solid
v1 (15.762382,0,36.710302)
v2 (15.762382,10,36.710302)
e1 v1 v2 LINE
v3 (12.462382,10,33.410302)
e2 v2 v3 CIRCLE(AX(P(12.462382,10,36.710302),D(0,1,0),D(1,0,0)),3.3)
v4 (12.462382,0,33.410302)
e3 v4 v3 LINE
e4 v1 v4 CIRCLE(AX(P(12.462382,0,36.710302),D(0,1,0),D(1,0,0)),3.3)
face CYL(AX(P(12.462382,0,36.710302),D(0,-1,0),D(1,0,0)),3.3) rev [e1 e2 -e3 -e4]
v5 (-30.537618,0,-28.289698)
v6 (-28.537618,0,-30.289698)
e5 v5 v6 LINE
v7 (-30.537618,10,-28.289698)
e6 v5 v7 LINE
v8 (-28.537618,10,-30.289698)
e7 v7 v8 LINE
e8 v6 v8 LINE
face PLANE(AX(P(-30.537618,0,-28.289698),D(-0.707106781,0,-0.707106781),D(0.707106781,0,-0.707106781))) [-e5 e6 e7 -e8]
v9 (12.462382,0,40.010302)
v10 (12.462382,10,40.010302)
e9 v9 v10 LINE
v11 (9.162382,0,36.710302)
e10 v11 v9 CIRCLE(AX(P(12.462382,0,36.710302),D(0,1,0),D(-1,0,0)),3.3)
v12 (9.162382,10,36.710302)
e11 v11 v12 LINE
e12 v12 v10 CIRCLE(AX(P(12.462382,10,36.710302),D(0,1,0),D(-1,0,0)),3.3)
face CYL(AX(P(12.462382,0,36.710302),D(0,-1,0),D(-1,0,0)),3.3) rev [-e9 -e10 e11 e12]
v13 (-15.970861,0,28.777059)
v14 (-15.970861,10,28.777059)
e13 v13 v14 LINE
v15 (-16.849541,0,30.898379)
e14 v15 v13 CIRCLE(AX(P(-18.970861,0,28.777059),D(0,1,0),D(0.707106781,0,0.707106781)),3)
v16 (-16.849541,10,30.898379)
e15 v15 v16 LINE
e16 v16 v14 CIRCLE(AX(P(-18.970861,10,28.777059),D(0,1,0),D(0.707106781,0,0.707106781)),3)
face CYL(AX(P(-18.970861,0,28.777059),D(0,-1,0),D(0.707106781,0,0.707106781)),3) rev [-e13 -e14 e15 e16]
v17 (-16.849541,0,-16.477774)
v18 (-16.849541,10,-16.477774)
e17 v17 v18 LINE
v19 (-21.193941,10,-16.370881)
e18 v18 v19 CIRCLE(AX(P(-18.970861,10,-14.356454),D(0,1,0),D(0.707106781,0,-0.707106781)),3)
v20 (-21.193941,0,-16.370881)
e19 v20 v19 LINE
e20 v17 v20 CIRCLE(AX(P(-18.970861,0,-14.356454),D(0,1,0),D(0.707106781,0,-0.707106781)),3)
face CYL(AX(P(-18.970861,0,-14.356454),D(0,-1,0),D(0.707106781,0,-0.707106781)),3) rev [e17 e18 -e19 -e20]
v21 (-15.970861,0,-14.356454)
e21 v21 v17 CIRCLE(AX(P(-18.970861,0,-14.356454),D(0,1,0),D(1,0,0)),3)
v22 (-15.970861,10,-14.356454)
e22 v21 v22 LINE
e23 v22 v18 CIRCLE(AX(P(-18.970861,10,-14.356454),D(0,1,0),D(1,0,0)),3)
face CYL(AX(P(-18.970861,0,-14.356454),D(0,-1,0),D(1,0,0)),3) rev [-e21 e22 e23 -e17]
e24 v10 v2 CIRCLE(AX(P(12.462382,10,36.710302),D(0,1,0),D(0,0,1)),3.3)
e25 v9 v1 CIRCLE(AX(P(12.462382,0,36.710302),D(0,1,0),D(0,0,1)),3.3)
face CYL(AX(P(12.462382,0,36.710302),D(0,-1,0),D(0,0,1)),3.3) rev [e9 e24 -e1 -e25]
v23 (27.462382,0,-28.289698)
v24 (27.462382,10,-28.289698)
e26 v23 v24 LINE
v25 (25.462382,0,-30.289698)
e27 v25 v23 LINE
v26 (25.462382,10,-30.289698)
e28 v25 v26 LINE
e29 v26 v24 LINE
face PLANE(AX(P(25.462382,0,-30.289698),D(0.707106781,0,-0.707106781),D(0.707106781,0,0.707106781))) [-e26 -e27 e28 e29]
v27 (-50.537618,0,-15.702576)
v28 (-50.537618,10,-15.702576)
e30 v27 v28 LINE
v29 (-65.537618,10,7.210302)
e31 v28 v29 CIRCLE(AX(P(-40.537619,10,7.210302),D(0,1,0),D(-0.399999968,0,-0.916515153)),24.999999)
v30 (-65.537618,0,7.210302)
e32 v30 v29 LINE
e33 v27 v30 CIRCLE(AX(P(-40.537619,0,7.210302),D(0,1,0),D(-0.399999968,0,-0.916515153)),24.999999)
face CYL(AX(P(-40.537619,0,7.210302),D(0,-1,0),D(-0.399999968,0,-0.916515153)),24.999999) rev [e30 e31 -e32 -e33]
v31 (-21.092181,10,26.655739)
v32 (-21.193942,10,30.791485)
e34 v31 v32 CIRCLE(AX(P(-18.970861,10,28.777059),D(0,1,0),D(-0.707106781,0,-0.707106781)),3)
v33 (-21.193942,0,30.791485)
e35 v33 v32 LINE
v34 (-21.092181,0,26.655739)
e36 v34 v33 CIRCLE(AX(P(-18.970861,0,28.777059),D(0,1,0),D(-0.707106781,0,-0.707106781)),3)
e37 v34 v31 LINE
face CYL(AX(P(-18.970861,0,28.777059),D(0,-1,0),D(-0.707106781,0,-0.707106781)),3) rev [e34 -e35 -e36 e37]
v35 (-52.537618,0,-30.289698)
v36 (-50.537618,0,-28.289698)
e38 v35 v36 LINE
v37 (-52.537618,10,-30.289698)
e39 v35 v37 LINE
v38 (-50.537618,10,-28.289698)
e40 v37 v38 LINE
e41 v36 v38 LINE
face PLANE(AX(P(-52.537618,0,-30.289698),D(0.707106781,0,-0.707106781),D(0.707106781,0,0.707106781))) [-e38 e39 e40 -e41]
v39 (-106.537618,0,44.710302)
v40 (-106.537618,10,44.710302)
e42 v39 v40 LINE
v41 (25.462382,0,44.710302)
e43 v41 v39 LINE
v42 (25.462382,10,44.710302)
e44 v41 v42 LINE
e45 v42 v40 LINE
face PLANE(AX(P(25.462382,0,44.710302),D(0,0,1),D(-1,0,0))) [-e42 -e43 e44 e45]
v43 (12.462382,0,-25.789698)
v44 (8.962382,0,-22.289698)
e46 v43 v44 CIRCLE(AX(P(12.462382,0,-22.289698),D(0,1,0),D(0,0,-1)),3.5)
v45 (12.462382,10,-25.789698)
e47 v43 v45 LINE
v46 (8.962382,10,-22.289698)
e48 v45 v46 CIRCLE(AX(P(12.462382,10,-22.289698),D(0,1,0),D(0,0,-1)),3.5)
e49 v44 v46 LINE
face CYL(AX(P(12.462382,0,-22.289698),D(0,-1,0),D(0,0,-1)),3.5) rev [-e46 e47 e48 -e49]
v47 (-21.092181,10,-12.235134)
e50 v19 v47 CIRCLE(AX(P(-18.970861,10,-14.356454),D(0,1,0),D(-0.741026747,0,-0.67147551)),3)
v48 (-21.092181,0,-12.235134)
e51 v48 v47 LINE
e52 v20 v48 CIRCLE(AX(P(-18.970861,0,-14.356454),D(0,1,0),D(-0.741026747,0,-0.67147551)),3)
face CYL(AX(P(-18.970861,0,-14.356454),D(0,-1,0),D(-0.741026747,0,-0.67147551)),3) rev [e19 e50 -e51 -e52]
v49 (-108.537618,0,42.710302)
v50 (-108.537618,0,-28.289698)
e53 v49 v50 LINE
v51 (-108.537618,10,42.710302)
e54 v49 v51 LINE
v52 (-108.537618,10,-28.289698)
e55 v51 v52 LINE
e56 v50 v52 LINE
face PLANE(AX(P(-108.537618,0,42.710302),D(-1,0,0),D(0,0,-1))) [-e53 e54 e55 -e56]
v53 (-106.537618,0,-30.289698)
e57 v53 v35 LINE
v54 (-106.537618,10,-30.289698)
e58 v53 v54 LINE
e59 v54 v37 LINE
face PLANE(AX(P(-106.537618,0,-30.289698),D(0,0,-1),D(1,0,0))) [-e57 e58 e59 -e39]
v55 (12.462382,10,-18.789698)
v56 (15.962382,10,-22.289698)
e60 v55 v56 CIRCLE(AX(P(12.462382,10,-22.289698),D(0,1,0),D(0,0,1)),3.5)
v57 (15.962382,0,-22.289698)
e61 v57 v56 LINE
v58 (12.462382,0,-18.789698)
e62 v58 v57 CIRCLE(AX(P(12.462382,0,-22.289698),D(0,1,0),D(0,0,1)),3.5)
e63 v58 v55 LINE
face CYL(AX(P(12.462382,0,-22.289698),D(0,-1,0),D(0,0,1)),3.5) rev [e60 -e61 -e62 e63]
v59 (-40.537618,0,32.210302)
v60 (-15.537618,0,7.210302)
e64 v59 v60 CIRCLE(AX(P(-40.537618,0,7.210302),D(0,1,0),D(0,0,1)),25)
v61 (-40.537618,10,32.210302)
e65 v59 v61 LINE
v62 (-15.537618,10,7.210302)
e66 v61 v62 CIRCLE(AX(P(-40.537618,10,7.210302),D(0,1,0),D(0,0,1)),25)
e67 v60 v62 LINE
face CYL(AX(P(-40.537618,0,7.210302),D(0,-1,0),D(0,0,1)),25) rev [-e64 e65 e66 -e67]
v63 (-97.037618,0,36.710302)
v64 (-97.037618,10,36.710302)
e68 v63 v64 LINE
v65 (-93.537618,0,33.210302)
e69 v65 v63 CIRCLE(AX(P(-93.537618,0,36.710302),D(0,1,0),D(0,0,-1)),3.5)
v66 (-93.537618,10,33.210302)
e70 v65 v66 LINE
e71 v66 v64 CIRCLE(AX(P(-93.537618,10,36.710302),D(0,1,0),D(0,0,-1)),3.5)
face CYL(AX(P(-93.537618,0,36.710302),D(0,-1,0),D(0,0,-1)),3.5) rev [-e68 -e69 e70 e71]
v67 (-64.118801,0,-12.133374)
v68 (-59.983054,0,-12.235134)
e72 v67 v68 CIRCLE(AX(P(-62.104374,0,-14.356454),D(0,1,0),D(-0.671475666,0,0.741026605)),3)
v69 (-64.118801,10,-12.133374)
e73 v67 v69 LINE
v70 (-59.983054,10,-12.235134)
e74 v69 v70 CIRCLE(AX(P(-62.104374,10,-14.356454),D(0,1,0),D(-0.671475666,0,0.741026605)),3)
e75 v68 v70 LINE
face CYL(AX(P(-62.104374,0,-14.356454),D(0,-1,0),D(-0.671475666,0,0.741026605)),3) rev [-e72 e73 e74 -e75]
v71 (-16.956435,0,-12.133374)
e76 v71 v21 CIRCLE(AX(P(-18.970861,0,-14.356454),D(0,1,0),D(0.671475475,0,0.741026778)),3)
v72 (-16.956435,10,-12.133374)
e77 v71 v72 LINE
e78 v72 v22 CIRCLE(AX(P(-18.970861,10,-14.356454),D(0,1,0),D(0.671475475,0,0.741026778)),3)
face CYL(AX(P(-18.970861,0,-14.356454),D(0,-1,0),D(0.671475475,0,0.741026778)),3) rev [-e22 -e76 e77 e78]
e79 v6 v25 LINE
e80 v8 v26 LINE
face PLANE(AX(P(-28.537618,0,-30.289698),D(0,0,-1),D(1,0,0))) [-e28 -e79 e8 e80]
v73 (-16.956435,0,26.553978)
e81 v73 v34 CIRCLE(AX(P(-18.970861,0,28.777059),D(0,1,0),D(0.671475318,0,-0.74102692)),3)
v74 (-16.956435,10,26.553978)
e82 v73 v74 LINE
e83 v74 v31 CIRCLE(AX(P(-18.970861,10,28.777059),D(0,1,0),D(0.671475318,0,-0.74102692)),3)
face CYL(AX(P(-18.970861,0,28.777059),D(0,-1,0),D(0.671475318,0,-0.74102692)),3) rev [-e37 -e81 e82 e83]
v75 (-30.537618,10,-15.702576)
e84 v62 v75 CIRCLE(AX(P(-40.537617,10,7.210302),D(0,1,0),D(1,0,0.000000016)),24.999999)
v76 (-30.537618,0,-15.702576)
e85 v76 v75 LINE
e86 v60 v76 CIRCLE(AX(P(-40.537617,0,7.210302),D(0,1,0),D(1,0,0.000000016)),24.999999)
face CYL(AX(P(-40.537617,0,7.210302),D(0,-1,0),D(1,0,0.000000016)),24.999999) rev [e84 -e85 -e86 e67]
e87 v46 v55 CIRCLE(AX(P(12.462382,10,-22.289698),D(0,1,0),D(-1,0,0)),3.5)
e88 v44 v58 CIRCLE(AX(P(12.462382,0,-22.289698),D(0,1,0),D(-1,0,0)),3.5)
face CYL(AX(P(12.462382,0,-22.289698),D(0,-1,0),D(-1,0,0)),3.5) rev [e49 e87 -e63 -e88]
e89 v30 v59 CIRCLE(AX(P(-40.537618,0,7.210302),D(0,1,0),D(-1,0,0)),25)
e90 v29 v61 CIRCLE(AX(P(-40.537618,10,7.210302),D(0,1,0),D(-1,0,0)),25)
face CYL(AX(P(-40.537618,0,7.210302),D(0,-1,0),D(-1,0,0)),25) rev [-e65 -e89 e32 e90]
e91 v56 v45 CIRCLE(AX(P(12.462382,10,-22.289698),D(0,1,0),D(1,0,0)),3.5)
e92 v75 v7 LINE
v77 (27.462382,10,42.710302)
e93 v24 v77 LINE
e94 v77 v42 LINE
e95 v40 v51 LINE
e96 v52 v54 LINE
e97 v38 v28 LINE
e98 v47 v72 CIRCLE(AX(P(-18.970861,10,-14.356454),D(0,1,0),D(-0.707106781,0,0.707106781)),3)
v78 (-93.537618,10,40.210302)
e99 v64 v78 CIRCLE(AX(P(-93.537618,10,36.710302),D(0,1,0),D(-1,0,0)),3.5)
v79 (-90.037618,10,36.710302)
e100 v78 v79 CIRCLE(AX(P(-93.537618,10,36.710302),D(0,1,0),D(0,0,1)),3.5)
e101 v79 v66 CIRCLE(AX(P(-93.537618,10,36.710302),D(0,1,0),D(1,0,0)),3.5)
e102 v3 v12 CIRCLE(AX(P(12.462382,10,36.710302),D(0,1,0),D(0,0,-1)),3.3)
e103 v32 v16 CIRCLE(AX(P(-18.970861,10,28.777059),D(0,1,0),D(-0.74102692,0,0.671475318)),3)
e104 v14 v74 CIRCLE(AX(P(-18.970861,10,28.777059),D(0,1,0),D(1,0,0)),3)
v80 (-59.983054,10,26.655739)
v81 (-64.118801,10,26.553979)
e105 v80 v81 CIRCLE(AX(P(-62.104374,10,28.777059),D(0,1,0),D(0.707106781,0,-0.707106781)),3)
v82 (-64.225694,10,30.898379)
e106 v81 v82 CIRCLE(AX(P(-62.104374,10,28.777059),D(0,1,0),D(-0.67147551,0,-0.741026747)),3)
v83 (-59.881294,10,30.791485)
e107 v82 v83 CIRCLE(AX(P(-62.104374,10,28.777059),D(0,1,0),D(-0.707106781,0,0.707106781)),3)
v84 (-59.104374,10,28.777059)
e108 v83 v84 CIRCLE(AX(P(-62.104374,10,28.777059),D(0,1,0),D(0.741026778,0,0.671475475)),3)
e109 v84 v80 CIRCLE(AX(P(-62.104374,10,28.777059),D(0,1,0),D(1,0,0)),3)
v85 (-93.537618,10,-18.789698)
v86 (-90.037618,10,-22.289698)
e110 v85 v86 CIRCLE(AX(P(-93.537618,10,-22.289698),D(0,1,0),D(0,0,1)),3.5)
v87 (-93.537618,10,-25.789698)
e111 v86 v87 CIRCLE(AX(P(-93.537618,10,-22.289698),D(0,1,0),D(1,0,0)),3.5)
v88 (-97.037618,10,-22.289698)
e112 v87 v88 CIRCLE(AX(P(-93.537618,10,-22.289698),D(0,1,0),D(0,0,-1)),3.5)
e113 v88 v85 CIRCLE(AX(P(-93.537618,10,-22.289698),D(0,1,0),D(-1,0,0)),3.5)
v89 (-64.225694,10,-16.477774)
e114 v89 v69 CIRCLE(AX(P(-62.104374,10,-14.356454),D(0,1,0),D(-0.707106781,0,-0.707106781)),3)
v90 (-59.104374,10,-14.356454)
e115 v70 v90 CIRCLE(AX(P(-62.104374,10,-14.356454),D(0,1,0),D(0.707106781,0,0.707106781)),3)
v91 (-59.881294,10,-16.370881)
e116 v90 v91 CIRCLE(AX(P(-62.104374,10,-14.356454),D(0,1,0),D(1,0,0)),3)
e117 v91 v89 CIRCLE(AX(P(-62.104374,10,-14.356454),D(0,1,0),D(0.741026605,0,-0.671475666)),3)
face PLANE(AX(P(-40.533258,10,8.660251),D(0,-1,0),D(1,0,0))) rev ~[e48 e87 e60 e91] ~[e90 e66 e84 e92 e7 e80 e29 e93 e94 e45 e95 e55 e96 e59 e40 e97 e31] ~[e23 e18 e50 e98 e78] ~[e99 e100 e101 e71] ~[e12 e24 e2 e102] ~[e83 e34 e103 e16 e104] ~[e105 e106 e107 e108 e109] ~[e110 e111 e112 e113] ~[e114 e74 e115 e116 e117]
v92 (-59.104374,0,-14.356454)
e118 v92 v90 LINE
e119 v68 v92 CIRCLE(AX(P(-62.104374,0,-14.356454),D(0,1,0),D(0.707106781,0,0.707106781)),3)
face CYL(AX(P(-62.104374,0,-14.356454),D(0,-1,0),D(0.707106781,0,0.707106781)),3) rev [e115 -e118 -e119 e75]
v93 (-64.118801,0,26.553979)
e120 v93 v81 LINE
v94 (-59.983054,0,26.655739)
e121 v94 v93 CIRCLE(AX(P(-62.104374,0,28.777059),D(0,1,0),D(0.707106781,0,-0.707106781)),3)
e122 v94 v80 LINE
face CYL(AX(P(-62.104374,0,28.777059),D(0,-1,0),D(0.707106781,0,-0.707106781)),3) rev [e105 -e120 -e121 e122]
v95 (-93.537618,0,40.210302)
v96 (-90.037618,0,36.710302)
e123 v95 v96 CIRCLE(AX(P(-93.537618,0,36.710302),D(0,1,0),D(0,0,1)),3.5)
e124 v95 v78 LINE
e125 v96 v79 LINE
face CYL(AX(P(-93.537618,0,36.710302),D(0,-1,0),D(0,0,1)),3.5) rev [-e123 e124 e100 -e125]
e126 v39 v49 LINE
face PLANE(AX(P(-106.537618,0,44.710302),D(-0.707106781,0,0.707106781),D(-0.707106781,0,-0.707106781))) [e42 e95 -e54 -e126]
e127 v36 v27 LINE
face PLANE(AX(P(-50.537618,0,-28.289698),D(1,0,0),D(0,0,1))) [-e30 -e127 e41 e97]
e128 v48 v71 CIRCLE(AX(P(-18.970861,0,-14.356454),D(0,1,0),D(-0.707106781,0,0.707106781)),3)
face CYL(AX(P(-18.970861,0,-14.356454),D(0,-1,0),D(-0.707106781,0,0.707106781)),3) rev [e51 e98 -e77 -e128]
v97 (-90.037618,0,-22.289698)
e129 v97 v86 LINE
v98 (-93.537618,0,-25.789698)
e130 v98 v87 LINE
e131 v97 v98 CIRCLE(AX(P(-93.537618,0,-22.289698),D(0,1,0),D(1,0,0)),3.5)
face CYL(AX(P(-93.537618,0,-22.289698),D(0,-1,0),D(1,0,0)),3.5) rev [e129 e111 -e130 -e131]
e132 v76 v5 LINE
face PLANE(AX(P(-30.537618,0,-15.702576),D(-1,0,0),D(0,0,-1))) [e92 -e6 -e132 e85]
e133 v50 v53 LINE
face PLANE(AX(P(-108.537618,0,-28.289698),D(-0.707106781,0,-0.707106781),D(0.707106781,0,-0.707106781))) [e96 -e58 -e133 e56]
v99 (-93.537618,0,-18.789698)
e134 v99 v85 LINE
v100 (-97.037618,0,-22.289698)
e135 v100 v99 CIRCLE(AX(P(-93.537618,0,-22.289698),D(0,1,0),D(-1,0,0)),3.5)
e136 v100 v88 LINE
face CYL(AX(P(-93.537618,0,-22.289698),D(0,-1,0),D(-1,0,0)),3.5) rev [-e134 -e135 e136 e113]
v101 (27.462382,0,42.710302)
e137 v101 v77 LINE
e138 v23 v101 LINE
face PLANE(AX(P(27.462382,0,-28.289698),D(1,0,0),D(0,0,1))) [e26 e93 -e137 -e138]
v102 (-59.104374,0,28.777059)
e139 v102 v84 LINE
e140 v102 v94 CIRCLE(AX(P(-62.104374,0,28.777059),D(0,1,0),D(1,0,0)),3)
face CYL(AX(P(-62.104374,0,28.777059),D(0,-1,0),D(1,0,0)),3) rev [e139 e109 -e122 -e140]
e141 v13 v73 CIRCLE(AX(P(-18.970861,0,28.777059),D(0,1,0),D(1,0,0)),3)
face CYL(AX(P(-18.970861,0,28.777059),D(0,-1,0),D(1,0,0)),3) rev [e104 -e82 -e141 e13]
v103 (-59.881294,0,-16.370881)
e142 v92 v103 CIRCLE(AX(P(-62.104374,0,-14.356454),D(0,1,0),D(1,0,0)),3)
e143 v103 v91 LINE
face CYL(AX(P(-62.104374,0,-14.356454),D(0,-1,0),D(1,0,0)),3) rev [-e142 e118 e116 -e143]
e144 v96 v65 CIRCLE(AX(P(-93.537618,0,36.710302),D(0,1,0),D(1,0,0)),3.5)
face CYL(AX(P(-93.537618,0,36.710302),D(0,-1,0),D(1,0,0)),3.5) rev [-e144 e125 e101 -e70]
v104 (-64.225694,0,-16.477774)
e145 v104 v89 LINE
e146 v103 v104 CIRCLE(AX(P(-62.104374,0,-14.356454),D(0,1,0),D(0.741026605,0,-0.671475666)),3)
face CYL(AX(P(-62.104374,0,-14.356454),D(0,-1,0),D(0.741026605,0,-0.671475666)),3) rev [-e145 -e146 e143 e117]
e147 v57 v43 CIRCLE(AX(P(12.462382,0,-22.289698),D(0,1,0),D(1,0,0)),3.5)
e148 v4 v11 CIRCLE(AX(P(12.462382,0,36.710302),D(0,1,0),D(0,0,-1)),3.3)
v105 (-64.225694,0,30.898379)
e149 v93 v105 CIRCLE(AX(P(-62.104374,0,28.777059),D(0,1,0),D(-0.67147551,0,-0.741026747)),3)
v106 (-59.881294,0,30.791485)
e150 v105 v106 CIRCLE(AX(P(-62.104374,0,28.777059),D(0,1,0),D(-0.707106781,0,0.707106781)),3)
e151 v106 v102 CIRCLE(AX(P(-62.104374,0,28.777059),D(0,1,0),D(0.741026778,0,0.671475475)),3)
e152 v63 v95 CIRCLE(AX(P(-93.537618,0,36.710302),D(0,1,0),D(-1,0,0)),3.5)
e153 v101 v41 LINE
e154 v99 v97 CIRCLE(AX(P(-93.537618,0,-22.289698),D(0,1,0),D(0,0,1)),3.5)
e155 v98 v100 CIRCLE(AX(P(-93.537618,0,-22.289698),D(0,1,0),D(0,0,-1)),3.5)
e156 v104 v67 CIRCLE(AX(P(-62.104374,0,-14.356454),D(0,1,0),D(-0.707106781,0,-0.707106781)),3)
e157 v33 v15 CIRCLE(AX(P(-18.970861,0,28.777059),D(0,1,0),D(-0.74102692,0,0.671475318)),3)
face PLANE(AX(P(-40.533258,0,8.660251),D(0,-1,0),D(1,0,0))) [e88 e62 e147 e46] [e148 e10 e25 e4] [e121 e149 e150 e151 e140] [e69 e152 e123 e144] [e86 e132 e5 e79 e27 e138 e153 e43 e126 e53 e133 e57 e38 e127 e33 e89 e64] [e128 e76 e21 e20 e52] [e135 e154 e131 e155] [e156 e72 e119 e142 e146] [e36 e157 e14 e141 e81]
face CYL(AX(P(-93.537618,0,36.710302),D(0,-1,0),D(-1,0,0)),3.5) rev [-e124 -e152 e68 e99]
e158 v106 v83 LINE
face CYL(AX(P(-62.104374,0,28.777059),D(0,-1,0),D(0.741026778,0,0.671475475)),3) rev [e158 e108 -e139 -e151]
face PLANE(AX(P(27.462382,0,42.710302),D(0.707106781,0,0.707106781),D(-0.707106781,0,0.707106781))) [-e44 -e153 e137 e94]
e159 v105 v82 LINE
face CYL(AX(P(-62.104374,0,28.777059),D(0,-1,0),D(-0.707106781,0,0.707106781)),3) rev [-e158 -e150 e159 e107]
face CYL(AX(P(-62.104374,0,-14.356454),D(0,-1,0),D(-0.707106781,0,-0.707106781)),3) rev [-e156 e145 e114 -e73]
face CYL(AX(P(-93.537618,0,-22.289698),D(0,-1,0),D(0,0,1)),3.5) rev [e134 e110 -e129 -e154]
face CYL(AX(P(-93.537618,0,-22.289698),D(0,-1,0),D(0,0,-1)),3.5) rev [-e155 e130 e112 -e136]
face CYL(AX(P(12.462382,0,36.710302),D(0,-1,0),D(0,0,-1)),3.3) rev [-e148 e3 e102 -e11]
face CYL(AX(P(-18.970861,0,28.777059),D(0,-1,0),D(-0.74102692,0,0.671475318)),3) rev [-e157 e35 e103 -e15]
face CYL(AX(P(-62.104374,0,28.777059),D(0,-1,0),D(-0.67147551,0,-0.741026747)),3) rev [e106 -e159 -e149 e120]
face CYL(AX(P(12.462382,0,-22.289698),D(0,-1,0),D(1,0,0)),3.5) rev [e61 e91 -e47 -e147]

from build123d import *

# Parameters (mm, degrees)
F1_DEPTH = 10


# Not quite as in the source:
# - ends of sketch curves that miss each other by under 0.0002 mm in the source are joined


with BuildPart() as f1:
    # F0 (on Front) → F1 (new body)
    with BuildSketch(Plane.XZ):
        with BuildLine():
            Line((-28.537618, -30.289698), (25.462382, -30.289698))
            Line((25.462382, -30.289698), (27.462382, -28.289698))
            Line((27.462382, -28.289698), (27.462382, 42.710302))
            Line((27.462382, 42.710302), (25.462382, 44.710302))
            Line((25.462382, 44.710302), (-106.537618, 44.710302))
            Line((-106.537618, 44.710302), (-108.537618, 42.710302))
            Line((-108.537618, 42.710302), (-108.537618, -28.289698))
            Line((-108.537618, -28.289698), (-106.537618, -30.289698))
            Line((-106.537618, -30.289698), (-52.537618, -30.289698))
            Line((-52.537618, -30.289698), (-50.537618, -28.289698))
            Line((-50.537618, -28.289698), (-50.537618, -21.6037570684))
            ThreePointArc((-50.537618, -21.6037570684), (-55.4409257201, -19.4006246843), (-59.881294185, -16.3708809994))
            ThreePointArc((-59.881294185, -16.3708809994), (-62.0305817628, -17.3555463136), (-64.2256943436, -16.4777743436))
            ThreePointArc((-64.2256943436, -16.4777743436), (-65.1034663136, -14.2826617628), (-64.1188009994, -12.133374185))
            ThreePointArc((-64.1188009994, -12.133374185), (-69.2558707453, -3.0615994432), (-71.037618, 7.210302))
            ThreePointArc((-71.037618, 7.210302), (-69.2558706203, 17.4822037925), (-64.1188005289, 26.5539787586))
            ThreePointArc((-64.1188005289, 26.5539787586), (-65.1034663058, 28.7032664454), (-64.2256943436, 30.8983793436))
            ThreePointArc((-64.2256943436, 30.8983793436), (-62.0305813759, 31.7761513041), (-59.8812936652, 30.7914854258))
            ThreePointArc((-59.8812936652, 30.7914854258), (-50.8095191267, 35.9285548585), (-40.537618, 37.710302))
            ThreePointArc((-40.537618, 37.710302), (-30.265716524, 35.9285547335), (-21.1939417612, 30.7914849552))
            ThreePointArc((-21.1939417612, 30.7914849552), (-19.0446539415, 31.7761512963), (-16.8495406564, 30.8983793436))
            ThreePointArc((-16.8495406564, 30.8983793436), (-16.1992224025, 29.9251092971), (-15.970861, 28.777059))
            ThreePointArc((-15.970861, 28.777059), (-16.2283003475, 27.5611802778), (-16.9564350448, 26.5539782388))
            ThreePointArc((-16.9564350448, 26.5539782388), (-11.8193652665, 17.482203476), (-10.037618, 7.210302))
            ThreePointArc((-10.037618, 7.210302), (-11.8193651415, -3.0615991267), (-16.9564345742, -12.1333736652))
            ThreePointArc((-16.9564345742, -12.1333736652), (-16.2283002188, -13.140575568), (-15.970861, -14.356454))
            ThreePointArc((-15.970861, -14.356454), (-16.1992224025, -15.5045042971), (-16.8495406564, -16.4777743436))
            ThreePointArc((-16.8495406564, -16.4777743436), (-19.0446535546, -17.3555463058), (-21.1939412414, -16.3708805289))
            ThreePointArc((-21.1939412414, -16.3708805289), (-25.6343099562, -19.4006245031), (-30.537618, -21.6037570684))
            Line((-30.537618, -21.6037570684), (-30.537618, -28.289698))
            Line((-30.537618, -28.289698), (-28.537618, -30.289698))
        make_face()
        with BuildLine():
            ThreePointArc((-93.537618, -18.789698), (-91.0627442658, -19.8148242658), (-90.037618, -22.289698))
            ThreePointArc((-90.037618, -22.289698), (-91.0627442658, -24.7645717342), (-93.537618, -25.789698))
            ThreePointArc((-93.537618, -25.789698), (-96.0124917342, -24.7645717342), (-97.037618, -22.289698))
            ThreePointArc((-97.037618, -22.289698), (-96.0124917342, -19.8148242658), (-93.537618, -18.789698))
        make_face(mode=Mode.SUBTRACT)
        with BuildLine():
            ThreePointArc((12.462382, -18.789698), (14.9372557342, -19.8148242658), (15.962382, -22.289698))
            ThreePointArc((15.962382, -22.289698), (14.9372557342, -24.7645717342), (12.462382, -25.789698))
            ThreePointArc((12.462382, -25.789698), (9.9875082658, -24.7645717342), (8.962382, -22.289698))
            ThreePointArc((8.962382, -22.289698), (9.9875082658, -19.8148242658), (12.462382, -18.789698))
        make_face(mode=Mode.SUBTRACT)
        with BuildLine():
            ThreePointArc((-93.537618, 40.210302), (-91.0627442658, 39.1851757342), (-90.037618, 36.710302))
            ThreePointArc((-90.037618, 36.710302), (-91.0627442658, 34.2354282658), (-93.537618, 33.210302))
            ThreePointArc((-93.537618, 33.210302), (-96.0124917342, 34.2354282658), (-97.037618, 36.710302))
            ThreePointArc((-97.037618, 36.710302), (-96.0124917342, 39.1851757342), (-93.537618, 40.210302))
        make_face(mode=Mode.SUBTRACT)
        with BuildLine():
            ThreePointArc((12.462382, 33.410302), (10.1289296221, 34.3768496221), (9.162382, 36.710302))
            ThreePointArc((9.162382, 36.710302), (10.1289296221, 39.0437543779), (12.462382, 40.010302))
            ThreePointArc((12.462382, 40.010302), (14.7958343779, 39.0437543779), (15.762382, 36.710302))
            ThreePointArc((15.762382, 36.710302), (14.7958343779, 34.3768496221), (12.462382, 33.410302))
        make_face(mode=Mode.SUBTRACT)
        with BuildLine():
            ThreePointArc((-40.537618, 32.210302), (-22.8599484703, 24.8879715297), (-15.537618, 7.210302))
            Line((-15.537618, 7.210302), (-10.037618, 7.210302))
            ThreePointArc((-10.037618, 7.210302), (-11.8193652665, 17.482203476), (-16.9564350448, 26.5539782388))
            ThreePointArc((-16.9564350448, 26.5539782388), (-19.0446539415, 25.7779667037), (-21.0921813436, 26.6557386564))
            ThreePointArc((-21.0921813436, 26.6557386564), (-21.9699532963, 28.7032660585), (-21.1939417612, 30.7914849552))
            ThreePointArc((-21.1939417612, 30.7914849552), (-30.265716524, 35.9285547335), (-40.537618, 37.710302))
            Line((-40.537618, 37.710302), (-40.537618, 32.210302))
        make_face()
        with BuildLine():
            ThreePointArc((-65.537618, 7.210302), (-58.2152875297, 24.8879715297), (-40.537618, 32.210302))
            Line((-40.537618, 32.210302), (-40.537618, 37.710302))
            ThreePointArc((-40.537618, 37.710302), (-50.8095191267, 35.9285548585), (-59.8812936652, 30.7914854258))
            ThreePointArc((-59.8812936652, 30.7914854258), (-59.3053347894, 29.8565864419), (-59.104374, 28.777059))
            ThreePointArc((-59.104374, 28.777059), (-59.3327354025, 27.6290087029), (-59.9830536564, 26.6557386564))
            ThreePointArc((-59.9830536564, 26.6557386564), (-62.0305814454, 25.7779666942), (-64.1188005289, 26.5539787586))
            ThreePointArc((-64.1188005289, 26.5539787586), (-69.2558706203, 17.4822037925), (-71.037618, 7.210302))
            Line((-71.037618, 7.210302), (-65.537618, 7.210302))
        make_face()
        with BuildLine():
            ThreePointArc((-59.881294185, -16.3708809994), (-55.4409257201, -19.4006246843), (-50.537618, -21.6037570684))
            Line((-50.537618, -21.6037570684), (-50.537618, -15.702576))
            ThreePointArc((-50.537618, -15.702576), (-61.4541187154, -6.4827618582), (-65.537618, 7.210302))
            Line((-65.537618, 7.210302), (-71.037618, 7.210302))
            ThreePointArc((-71.037618, 7.210302), (-69.2558707453, -3.0615994432), (-64.1188009994, -12.133374185))
            ThreePointArc((-64.1188009994, -12.133374185), (-62.0305817628, -11.3573616864), (-59.9830536564, -12.2351336564))
            ThreePointArc((-59.9830536564, -12.2351336564), (-59.3327354025, -13.2084037029), (-59.104374, -14.356454))
            ThreePointArc((-59.104374, -14.356454), (-59.3053349287, -15.435981803), (-59.881294185, -16.3708809994))
        make_face()
        with BuildLine():
            Line((-30.537618, -15.702576), (-30.537618, -21.6037570684))
            ThreePointArc((-30.537618, -21.6037570684), (-25.6343099562, -19.4006245031), (-21.1939412414, -16.3708805289))
            ThreePointArc((-21.1939412414, -16.3708805289), (-21.9699533058, -14.2826614454), (-21.0921813436, -12.2351336564))
            ThreePointArc((-21.0921813436, -12.2351336564), (-19.0446536241, -11.3573616959), (-16.9564345742, -12.1333736652))
            ThreePointArc((-16.9564345742, -12.1333736652), (-11.8193651415, -3.0615991267), (-10.037618, 7.210302))
            Line((-10.037618, 7.210302), (-15.537618, 7.210302))
            ThreePointArc((-15.537618, 7.210302), (-19.6211172846, -6.4827618582), (-30.537618, -15.702576))
        make_face()
    extrude(amount=-F1_DEPTH)


solid = f1.part
